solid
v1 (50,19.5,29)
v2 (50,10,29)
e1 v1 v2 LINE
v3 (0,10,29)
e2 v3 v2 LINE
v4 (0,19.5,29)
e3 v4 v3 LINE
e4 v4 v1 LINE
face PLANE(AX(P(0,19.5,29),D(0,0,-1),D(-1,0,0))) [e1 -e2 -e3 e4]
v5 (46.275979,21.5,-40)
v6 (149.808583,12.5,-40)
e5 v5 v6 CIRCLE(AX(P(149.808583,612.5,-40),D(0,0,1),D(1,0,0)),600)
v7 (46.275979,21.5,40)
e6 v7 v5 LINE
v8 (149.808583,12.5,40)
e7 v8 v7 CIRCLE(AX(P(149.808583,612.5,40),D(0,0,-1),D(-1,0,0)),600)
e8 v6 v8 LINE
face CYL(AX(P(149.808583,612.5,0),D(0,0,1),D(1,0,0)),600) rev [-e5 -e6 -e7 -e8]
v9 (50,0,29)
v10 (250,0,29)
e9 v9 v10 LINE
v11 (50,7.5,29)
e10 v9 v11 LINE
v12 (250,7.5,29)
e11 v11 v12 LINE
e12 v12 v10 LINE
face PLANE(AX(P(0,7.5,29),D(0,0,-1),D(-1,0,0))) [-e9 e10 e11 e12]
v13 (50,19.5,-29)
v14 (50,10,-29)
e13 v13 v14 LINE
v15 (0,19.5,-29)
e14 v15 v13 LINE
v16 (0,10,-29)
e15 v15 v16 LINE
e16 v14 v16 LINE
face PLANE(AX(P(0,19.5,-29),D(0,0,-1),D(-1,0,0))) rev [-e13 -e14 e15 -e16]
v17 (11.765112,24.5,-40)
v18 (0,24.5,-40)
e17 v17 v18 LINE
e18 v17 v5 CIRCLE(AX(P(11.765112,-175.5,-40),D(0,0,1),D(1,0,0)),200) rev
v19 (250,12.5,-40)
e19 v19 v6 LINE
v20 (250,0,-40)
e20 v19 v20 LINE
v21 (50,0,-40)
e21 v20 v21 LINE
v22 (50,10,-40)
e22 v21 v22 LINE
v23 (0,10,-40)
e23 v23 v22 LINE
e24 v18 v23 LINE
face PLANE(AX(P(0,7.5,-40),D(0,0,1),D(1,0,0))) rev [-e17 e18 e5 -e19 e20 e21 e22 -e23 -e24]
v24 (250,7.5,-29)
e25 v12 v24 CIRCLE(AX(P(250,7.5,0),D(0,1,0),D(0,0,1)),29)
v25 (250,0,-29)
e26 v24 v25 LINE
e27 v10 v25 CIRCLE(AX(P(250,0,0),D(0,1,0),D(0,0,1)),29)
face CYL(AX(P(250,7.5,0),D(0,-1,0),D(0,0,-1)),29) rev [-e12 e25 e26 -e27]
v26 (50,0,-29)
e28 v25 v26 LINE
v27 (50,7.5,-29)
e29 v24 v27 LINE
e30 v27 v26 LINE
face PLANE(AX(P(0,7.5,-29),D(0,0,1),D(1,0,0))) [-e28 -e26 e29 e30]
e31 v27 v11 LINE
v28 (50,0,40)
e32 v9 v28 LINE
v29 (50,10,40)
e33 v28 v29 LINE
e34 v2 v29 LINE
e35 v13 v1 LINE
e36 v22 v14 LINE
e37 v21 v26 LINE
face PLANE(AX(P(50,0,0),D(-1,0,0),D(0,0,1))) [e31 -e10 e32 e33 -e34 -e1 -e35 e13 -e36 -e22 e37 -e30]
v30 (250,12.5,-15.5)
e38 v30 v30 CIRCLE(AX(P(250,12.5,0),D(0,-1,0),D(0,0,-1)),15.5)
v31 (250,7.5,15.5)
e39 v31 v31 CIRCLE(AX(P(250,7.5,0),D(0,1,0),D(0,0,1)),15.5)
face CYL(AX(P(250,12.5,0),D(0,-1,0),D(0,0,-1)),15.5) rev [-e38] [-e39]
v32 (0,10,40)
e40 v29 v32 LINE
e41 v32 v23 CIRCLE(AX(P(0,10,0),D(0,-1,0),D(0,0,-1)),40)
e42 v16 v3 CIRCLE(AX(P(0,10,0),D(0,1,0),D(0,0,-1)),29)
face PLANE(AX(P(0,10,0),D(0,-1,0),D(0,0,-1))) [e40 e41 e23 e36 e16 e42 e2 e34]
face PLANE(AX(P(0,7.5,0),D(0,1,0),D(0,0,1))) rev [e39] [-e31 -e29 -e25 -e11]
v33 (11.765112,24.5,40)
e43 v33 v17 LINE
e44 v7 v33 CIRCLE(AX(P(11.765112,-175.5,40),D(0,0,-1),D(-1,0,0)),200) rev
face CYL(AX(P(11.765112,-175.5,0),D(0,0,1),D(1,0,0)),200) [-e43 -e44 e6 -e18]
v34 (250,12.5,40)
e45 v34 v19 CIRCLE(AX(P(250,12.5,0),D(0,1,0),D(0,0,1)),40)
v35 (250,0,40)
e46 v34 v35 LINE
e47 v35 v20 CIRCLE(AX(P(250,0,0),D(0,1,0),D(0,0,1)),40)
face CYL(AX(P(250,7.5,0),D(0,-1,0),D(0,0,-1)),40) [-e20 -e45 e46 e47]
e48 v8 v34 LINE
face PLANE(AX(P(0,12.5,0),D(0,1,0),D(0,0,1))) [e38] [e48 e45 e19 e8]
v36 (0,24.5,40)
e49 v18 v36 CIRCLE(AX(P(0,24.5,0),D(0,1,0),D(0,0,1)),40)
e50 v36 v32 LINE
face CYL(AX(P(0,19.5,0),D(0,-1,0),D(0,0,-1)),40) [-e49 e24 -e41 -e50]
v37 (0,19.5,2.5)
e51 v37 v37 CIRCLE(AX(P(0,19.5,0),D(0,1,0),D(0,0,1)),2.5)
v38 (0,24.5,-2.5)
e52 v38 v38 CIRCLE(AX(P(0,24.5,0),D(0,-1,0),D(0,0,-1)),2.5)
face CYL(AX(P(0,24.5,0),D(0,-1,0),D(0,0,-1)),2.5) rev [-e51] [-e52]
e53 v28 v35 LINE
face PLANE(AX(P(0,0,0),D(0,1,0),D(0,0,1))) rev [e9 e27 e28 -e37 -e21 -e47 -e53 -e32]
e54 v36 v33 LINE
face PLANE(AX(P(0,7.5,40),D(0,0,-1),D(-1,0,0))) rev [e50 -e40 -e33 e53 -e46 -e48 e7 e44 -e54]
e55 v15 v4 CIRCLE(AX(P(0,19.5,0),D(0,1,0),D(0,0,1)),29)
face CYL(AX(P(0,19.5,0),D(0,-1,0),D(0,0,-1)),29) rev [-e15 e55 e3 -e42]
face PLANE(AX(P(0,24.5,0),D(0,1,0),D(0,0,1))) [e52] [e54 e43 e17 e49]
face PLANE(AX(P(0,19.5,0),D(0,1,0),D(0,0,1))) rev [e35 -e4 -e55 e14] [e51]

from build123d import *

# Parameters (mm, degrees)
BOSS_EXTRUDE1_DEPTH     = 7.5
CUT_EXTRUDE1_DEPTH      = 293.841680776
CUT_EXTRUDE1_DEPTH_BACK = 293.841680776
BOSS_EXTRUDE3_DEPTH     = 5
CUT_EXTRUDE2_DEPTH      = 293.841680776
CUT_EXTRUDE2_DEPTH_BACK = 293.841680776
SKETCH11_R              = 15.5
SKETCH12_W              = 30
SKETCH12_H              = 11
SKETCH12_H_2            = 58
BOSS_EXTRUDE4_DEPTH     = 7
BOSS_EXTRUDE5_DEPTH     = 5
BOSS_EXTRUDE6_START     = 2.5
BOSS_EXTRUDE6_DEPTH     = 2.5
CUT_EXTRUDE3_DEPTH      = 294.394359182
CUT_EXTRUDE3_DEPTH_BACK = 294.394359182
SKETCH15_R              = 2.5
FILLET1_R               = 200
FILLET2_R               = 600


with BuildPart() as part:
    # Sketch1 → Boss-Extrude1 (new body)
    with BuildSketch(Plane(origin=(0, 0, 0), x_dir=(1, 0, 0), z_dir=(0, 1, 0))):
        with BuildLine():
            Line((0, -40), (250, -40))
            ThreePointArc((250, -40), (290, 0), (250, 40))
            Line((250, 40), (0, 40))
            ThreePointArc((0, 40), (-40, 0), (0, -40))
        make_face()
        with BuildLine():
            Line((0, 29), (250, 29))
            ThreePointArc((250, 29), (279, 0), (250, -29))
            Line((250, -29), (0, -29))
            ThreePointArc((0, -29), (-29, 0), (0, 29))
        make_face(mode=Mode.SUBTRACT)
    extrude(amount=BOSS_EXTRUDE1_DEPTH)

    # Sketch9 → Cut-Extrude1 (cut, two sides: drawn at the far end of the back side and taken through both)
    with BuildSketch(Plane(origin=(0, 7.5, 0), x_dir=(1, 0, 0), z_dir=(0, 1, 0)).offset(-CUT_EXTRUDE1_DEPTH_BACK)):
        with BuildLine():
            Line((50, 29), (50, -29))
            Line((50, -29), (250, -29))
            ThreePointArc((250, -29), (279, 0), (250, 29))
            Line((250, 29), (50, 29))
        make_face()
        with BuildLine():
            Line((0, -40), (50, -40))
            Line((50, -40), (50, -29))
            Line((50, -29), (0, -29))
            ThreePointArc((0, -29), (-29, 0), (0, 29))
            Line((0, 29), (50, 29))
            Line((50, 29), (50, 40))
            Line((50, 40), (0, 40))
            ThreePointArc((0, 40), (-40, 0), (0, -40))
        make_face()
    extrude(amount=CUT_EXTRUDE1_DEPTH + CUT_EXTRUDE1_DEPTH_BACK, mode=Mode.SUBTRACT)

    # Sketch9<3> → Boss-Extrude3 (add)
    with BuildSketch(Plane(origin=(0, 7.5, 0), x_dir=(1, 0, 0), z_dir=(0, 1, 0))):
        with BuildLine():
            Line((50, 40), (50, -40))
            Line((50, -40), (250, -40))
            ThreePointArc((250, -40), (290, 0), (250, 40))
            Line((250, 40), (50, 40))
        make_face()
    extrude(amount=BOSS_EXTRUDE3_DEPTH)

    # Sketch11 → Cut-Extrude2 (cut, two sides: drawn at the far end of the back side and taken through both)
    with BuildSketch(Plane.XZ.offset(-7.5).offset(-CUT_EXTRUDE2_DEPTH_BACK)):
        with Locations(Location((250, 0, 0), (0, 0, 270))):
            Circle(SKETCH11_R)
    extrude(amount=CUT_EXTRUDE2_DEPTH + CUT_EXTRUDE2_DEPTH_BACK, mode=Mode.SUBTRACT)

    # Sketch12 → Boss-Extrude4 (add)
    with BuildSketch(Plane(origin=(0, 12.5, 0), x_dir=(1, 0, 0), z_dir=(0, 1, 0))):
        with Locations((65, -34.5)):
            Rectangle(SKETCH12_W, SKETCH12_H)
        with BuildLine():
            ThreePointArc((0, 40), (-40, 0), (0, -40))
            Line((0, -40), (50, -40))
            Line((50, -40), (50, -29))
            Line((50, -29), (0, -29))
            ThreePointArc((0, -29), (-29, 0), (0, 29))
            Line((0, 29), (50, 29))
            Line((50, 29), (50, 40))
            Line((50, 40), (0, 40))
        make_face()
        with Locations((65, 34.5)):
            Rectangle(SKETCH12_W, SKETCH12_H)
        with Locations((65, 0)):
            Rectangle(SKETCH12_W, SKETCH12_H_2)
    extrude(amount=BOSS_EXTRUDE4_DEPTH)

    # Sketch13 → Boss-Extrude5 (add)
    with BuildSketch(Plane(origin=(0, 19.5, 0), x_dir=(1, 0, 0), z_dir=(0, 1, 0))):
        with BuildLine():
            Line((80, -40), (80, 40))
            Line((80, 40), (0, 40))
            ThreePointArc((0, 40), (-40, 0), (0, -40))
            Line((0, -40), (80, -40))
        make_face()
    extrude(amount=BOSS_EXTRUDE5_DEPTH)

    # Sketch14 → Boss-Extrude6 (add)
    with BuildSketch(Plane.XZ.offset(-12.5).offset(BOSS_EXTRUDE6_START)):
        with BuildLine():
            Line((0, -40), (50, -40))
            Line((50, -40), (50, -29))
            Line((50, -29), (0, -29))
            ThreePointArc((0, -29), (-29, 0), (0, 29))
            Line((0, 29), (50, 29))
            Line((50, 29), (50, 40))
            Line((50, 40), (0, 40))
            ThreePointArc((0, 40), (-40, 0), (0, -40))
        make_face()
    extrude(amount=-BOSS_EXTRUDE6_DEPTH)

    # Sketch15 → Cut-Extrude3 (cut, two sides: drawn at the far end of the back side and taken through both)
    with BuildSketch(Plane.XZ.offset(-19.5).offset(-CUT_EXTRUDE3_DEPTH_BACK)):
        with Locations(Location((0, 0, 0), (0, 0, 270))):
            Circle(SKETCH15_R)
    extrude(amount=CUT_EXTRUDE3_DEPTH + CUT_EXTRUDE3_DEPTH_BACK, mode=Mode.SUBTRACT)

    # Fillet1
    # the kernel refuses this fillet: 200 mm, written as the material it takes off along each edge
    with BuildSketch(Plane(origin=(80, 24.5, 210.587221092), x_dir=(0, -1, 0), z_dir=(0, 0, -1))) as fillet1_piece_1:
        with BuildLine():
            CenterArc((200, 68.234888437), FILLET1_R, 180, 19.948443589)
            Line((0, 68.234888437), (-4, 68.234888437))
            Line((-4, 68.234888437), (-4, 0))
            Line((-4, 0), (0, -4))
            ThreePointArc((0, -4), (6, -4), (8.24, -1.364697769))
            Line((8.24, -1.364697769), (12, 0))
        make_face()
    extrude(amount=421.174442185, mode=Mode.SUBTRACT)

    # Fillet2
    fillet2_edges = [part.edges().sort_by_distance(p)[0] for p in [
        (80, 12.5, 0),
    ]]
    fillet(fillet2_edges, radius=FILLET2_R)


solid = part.part
